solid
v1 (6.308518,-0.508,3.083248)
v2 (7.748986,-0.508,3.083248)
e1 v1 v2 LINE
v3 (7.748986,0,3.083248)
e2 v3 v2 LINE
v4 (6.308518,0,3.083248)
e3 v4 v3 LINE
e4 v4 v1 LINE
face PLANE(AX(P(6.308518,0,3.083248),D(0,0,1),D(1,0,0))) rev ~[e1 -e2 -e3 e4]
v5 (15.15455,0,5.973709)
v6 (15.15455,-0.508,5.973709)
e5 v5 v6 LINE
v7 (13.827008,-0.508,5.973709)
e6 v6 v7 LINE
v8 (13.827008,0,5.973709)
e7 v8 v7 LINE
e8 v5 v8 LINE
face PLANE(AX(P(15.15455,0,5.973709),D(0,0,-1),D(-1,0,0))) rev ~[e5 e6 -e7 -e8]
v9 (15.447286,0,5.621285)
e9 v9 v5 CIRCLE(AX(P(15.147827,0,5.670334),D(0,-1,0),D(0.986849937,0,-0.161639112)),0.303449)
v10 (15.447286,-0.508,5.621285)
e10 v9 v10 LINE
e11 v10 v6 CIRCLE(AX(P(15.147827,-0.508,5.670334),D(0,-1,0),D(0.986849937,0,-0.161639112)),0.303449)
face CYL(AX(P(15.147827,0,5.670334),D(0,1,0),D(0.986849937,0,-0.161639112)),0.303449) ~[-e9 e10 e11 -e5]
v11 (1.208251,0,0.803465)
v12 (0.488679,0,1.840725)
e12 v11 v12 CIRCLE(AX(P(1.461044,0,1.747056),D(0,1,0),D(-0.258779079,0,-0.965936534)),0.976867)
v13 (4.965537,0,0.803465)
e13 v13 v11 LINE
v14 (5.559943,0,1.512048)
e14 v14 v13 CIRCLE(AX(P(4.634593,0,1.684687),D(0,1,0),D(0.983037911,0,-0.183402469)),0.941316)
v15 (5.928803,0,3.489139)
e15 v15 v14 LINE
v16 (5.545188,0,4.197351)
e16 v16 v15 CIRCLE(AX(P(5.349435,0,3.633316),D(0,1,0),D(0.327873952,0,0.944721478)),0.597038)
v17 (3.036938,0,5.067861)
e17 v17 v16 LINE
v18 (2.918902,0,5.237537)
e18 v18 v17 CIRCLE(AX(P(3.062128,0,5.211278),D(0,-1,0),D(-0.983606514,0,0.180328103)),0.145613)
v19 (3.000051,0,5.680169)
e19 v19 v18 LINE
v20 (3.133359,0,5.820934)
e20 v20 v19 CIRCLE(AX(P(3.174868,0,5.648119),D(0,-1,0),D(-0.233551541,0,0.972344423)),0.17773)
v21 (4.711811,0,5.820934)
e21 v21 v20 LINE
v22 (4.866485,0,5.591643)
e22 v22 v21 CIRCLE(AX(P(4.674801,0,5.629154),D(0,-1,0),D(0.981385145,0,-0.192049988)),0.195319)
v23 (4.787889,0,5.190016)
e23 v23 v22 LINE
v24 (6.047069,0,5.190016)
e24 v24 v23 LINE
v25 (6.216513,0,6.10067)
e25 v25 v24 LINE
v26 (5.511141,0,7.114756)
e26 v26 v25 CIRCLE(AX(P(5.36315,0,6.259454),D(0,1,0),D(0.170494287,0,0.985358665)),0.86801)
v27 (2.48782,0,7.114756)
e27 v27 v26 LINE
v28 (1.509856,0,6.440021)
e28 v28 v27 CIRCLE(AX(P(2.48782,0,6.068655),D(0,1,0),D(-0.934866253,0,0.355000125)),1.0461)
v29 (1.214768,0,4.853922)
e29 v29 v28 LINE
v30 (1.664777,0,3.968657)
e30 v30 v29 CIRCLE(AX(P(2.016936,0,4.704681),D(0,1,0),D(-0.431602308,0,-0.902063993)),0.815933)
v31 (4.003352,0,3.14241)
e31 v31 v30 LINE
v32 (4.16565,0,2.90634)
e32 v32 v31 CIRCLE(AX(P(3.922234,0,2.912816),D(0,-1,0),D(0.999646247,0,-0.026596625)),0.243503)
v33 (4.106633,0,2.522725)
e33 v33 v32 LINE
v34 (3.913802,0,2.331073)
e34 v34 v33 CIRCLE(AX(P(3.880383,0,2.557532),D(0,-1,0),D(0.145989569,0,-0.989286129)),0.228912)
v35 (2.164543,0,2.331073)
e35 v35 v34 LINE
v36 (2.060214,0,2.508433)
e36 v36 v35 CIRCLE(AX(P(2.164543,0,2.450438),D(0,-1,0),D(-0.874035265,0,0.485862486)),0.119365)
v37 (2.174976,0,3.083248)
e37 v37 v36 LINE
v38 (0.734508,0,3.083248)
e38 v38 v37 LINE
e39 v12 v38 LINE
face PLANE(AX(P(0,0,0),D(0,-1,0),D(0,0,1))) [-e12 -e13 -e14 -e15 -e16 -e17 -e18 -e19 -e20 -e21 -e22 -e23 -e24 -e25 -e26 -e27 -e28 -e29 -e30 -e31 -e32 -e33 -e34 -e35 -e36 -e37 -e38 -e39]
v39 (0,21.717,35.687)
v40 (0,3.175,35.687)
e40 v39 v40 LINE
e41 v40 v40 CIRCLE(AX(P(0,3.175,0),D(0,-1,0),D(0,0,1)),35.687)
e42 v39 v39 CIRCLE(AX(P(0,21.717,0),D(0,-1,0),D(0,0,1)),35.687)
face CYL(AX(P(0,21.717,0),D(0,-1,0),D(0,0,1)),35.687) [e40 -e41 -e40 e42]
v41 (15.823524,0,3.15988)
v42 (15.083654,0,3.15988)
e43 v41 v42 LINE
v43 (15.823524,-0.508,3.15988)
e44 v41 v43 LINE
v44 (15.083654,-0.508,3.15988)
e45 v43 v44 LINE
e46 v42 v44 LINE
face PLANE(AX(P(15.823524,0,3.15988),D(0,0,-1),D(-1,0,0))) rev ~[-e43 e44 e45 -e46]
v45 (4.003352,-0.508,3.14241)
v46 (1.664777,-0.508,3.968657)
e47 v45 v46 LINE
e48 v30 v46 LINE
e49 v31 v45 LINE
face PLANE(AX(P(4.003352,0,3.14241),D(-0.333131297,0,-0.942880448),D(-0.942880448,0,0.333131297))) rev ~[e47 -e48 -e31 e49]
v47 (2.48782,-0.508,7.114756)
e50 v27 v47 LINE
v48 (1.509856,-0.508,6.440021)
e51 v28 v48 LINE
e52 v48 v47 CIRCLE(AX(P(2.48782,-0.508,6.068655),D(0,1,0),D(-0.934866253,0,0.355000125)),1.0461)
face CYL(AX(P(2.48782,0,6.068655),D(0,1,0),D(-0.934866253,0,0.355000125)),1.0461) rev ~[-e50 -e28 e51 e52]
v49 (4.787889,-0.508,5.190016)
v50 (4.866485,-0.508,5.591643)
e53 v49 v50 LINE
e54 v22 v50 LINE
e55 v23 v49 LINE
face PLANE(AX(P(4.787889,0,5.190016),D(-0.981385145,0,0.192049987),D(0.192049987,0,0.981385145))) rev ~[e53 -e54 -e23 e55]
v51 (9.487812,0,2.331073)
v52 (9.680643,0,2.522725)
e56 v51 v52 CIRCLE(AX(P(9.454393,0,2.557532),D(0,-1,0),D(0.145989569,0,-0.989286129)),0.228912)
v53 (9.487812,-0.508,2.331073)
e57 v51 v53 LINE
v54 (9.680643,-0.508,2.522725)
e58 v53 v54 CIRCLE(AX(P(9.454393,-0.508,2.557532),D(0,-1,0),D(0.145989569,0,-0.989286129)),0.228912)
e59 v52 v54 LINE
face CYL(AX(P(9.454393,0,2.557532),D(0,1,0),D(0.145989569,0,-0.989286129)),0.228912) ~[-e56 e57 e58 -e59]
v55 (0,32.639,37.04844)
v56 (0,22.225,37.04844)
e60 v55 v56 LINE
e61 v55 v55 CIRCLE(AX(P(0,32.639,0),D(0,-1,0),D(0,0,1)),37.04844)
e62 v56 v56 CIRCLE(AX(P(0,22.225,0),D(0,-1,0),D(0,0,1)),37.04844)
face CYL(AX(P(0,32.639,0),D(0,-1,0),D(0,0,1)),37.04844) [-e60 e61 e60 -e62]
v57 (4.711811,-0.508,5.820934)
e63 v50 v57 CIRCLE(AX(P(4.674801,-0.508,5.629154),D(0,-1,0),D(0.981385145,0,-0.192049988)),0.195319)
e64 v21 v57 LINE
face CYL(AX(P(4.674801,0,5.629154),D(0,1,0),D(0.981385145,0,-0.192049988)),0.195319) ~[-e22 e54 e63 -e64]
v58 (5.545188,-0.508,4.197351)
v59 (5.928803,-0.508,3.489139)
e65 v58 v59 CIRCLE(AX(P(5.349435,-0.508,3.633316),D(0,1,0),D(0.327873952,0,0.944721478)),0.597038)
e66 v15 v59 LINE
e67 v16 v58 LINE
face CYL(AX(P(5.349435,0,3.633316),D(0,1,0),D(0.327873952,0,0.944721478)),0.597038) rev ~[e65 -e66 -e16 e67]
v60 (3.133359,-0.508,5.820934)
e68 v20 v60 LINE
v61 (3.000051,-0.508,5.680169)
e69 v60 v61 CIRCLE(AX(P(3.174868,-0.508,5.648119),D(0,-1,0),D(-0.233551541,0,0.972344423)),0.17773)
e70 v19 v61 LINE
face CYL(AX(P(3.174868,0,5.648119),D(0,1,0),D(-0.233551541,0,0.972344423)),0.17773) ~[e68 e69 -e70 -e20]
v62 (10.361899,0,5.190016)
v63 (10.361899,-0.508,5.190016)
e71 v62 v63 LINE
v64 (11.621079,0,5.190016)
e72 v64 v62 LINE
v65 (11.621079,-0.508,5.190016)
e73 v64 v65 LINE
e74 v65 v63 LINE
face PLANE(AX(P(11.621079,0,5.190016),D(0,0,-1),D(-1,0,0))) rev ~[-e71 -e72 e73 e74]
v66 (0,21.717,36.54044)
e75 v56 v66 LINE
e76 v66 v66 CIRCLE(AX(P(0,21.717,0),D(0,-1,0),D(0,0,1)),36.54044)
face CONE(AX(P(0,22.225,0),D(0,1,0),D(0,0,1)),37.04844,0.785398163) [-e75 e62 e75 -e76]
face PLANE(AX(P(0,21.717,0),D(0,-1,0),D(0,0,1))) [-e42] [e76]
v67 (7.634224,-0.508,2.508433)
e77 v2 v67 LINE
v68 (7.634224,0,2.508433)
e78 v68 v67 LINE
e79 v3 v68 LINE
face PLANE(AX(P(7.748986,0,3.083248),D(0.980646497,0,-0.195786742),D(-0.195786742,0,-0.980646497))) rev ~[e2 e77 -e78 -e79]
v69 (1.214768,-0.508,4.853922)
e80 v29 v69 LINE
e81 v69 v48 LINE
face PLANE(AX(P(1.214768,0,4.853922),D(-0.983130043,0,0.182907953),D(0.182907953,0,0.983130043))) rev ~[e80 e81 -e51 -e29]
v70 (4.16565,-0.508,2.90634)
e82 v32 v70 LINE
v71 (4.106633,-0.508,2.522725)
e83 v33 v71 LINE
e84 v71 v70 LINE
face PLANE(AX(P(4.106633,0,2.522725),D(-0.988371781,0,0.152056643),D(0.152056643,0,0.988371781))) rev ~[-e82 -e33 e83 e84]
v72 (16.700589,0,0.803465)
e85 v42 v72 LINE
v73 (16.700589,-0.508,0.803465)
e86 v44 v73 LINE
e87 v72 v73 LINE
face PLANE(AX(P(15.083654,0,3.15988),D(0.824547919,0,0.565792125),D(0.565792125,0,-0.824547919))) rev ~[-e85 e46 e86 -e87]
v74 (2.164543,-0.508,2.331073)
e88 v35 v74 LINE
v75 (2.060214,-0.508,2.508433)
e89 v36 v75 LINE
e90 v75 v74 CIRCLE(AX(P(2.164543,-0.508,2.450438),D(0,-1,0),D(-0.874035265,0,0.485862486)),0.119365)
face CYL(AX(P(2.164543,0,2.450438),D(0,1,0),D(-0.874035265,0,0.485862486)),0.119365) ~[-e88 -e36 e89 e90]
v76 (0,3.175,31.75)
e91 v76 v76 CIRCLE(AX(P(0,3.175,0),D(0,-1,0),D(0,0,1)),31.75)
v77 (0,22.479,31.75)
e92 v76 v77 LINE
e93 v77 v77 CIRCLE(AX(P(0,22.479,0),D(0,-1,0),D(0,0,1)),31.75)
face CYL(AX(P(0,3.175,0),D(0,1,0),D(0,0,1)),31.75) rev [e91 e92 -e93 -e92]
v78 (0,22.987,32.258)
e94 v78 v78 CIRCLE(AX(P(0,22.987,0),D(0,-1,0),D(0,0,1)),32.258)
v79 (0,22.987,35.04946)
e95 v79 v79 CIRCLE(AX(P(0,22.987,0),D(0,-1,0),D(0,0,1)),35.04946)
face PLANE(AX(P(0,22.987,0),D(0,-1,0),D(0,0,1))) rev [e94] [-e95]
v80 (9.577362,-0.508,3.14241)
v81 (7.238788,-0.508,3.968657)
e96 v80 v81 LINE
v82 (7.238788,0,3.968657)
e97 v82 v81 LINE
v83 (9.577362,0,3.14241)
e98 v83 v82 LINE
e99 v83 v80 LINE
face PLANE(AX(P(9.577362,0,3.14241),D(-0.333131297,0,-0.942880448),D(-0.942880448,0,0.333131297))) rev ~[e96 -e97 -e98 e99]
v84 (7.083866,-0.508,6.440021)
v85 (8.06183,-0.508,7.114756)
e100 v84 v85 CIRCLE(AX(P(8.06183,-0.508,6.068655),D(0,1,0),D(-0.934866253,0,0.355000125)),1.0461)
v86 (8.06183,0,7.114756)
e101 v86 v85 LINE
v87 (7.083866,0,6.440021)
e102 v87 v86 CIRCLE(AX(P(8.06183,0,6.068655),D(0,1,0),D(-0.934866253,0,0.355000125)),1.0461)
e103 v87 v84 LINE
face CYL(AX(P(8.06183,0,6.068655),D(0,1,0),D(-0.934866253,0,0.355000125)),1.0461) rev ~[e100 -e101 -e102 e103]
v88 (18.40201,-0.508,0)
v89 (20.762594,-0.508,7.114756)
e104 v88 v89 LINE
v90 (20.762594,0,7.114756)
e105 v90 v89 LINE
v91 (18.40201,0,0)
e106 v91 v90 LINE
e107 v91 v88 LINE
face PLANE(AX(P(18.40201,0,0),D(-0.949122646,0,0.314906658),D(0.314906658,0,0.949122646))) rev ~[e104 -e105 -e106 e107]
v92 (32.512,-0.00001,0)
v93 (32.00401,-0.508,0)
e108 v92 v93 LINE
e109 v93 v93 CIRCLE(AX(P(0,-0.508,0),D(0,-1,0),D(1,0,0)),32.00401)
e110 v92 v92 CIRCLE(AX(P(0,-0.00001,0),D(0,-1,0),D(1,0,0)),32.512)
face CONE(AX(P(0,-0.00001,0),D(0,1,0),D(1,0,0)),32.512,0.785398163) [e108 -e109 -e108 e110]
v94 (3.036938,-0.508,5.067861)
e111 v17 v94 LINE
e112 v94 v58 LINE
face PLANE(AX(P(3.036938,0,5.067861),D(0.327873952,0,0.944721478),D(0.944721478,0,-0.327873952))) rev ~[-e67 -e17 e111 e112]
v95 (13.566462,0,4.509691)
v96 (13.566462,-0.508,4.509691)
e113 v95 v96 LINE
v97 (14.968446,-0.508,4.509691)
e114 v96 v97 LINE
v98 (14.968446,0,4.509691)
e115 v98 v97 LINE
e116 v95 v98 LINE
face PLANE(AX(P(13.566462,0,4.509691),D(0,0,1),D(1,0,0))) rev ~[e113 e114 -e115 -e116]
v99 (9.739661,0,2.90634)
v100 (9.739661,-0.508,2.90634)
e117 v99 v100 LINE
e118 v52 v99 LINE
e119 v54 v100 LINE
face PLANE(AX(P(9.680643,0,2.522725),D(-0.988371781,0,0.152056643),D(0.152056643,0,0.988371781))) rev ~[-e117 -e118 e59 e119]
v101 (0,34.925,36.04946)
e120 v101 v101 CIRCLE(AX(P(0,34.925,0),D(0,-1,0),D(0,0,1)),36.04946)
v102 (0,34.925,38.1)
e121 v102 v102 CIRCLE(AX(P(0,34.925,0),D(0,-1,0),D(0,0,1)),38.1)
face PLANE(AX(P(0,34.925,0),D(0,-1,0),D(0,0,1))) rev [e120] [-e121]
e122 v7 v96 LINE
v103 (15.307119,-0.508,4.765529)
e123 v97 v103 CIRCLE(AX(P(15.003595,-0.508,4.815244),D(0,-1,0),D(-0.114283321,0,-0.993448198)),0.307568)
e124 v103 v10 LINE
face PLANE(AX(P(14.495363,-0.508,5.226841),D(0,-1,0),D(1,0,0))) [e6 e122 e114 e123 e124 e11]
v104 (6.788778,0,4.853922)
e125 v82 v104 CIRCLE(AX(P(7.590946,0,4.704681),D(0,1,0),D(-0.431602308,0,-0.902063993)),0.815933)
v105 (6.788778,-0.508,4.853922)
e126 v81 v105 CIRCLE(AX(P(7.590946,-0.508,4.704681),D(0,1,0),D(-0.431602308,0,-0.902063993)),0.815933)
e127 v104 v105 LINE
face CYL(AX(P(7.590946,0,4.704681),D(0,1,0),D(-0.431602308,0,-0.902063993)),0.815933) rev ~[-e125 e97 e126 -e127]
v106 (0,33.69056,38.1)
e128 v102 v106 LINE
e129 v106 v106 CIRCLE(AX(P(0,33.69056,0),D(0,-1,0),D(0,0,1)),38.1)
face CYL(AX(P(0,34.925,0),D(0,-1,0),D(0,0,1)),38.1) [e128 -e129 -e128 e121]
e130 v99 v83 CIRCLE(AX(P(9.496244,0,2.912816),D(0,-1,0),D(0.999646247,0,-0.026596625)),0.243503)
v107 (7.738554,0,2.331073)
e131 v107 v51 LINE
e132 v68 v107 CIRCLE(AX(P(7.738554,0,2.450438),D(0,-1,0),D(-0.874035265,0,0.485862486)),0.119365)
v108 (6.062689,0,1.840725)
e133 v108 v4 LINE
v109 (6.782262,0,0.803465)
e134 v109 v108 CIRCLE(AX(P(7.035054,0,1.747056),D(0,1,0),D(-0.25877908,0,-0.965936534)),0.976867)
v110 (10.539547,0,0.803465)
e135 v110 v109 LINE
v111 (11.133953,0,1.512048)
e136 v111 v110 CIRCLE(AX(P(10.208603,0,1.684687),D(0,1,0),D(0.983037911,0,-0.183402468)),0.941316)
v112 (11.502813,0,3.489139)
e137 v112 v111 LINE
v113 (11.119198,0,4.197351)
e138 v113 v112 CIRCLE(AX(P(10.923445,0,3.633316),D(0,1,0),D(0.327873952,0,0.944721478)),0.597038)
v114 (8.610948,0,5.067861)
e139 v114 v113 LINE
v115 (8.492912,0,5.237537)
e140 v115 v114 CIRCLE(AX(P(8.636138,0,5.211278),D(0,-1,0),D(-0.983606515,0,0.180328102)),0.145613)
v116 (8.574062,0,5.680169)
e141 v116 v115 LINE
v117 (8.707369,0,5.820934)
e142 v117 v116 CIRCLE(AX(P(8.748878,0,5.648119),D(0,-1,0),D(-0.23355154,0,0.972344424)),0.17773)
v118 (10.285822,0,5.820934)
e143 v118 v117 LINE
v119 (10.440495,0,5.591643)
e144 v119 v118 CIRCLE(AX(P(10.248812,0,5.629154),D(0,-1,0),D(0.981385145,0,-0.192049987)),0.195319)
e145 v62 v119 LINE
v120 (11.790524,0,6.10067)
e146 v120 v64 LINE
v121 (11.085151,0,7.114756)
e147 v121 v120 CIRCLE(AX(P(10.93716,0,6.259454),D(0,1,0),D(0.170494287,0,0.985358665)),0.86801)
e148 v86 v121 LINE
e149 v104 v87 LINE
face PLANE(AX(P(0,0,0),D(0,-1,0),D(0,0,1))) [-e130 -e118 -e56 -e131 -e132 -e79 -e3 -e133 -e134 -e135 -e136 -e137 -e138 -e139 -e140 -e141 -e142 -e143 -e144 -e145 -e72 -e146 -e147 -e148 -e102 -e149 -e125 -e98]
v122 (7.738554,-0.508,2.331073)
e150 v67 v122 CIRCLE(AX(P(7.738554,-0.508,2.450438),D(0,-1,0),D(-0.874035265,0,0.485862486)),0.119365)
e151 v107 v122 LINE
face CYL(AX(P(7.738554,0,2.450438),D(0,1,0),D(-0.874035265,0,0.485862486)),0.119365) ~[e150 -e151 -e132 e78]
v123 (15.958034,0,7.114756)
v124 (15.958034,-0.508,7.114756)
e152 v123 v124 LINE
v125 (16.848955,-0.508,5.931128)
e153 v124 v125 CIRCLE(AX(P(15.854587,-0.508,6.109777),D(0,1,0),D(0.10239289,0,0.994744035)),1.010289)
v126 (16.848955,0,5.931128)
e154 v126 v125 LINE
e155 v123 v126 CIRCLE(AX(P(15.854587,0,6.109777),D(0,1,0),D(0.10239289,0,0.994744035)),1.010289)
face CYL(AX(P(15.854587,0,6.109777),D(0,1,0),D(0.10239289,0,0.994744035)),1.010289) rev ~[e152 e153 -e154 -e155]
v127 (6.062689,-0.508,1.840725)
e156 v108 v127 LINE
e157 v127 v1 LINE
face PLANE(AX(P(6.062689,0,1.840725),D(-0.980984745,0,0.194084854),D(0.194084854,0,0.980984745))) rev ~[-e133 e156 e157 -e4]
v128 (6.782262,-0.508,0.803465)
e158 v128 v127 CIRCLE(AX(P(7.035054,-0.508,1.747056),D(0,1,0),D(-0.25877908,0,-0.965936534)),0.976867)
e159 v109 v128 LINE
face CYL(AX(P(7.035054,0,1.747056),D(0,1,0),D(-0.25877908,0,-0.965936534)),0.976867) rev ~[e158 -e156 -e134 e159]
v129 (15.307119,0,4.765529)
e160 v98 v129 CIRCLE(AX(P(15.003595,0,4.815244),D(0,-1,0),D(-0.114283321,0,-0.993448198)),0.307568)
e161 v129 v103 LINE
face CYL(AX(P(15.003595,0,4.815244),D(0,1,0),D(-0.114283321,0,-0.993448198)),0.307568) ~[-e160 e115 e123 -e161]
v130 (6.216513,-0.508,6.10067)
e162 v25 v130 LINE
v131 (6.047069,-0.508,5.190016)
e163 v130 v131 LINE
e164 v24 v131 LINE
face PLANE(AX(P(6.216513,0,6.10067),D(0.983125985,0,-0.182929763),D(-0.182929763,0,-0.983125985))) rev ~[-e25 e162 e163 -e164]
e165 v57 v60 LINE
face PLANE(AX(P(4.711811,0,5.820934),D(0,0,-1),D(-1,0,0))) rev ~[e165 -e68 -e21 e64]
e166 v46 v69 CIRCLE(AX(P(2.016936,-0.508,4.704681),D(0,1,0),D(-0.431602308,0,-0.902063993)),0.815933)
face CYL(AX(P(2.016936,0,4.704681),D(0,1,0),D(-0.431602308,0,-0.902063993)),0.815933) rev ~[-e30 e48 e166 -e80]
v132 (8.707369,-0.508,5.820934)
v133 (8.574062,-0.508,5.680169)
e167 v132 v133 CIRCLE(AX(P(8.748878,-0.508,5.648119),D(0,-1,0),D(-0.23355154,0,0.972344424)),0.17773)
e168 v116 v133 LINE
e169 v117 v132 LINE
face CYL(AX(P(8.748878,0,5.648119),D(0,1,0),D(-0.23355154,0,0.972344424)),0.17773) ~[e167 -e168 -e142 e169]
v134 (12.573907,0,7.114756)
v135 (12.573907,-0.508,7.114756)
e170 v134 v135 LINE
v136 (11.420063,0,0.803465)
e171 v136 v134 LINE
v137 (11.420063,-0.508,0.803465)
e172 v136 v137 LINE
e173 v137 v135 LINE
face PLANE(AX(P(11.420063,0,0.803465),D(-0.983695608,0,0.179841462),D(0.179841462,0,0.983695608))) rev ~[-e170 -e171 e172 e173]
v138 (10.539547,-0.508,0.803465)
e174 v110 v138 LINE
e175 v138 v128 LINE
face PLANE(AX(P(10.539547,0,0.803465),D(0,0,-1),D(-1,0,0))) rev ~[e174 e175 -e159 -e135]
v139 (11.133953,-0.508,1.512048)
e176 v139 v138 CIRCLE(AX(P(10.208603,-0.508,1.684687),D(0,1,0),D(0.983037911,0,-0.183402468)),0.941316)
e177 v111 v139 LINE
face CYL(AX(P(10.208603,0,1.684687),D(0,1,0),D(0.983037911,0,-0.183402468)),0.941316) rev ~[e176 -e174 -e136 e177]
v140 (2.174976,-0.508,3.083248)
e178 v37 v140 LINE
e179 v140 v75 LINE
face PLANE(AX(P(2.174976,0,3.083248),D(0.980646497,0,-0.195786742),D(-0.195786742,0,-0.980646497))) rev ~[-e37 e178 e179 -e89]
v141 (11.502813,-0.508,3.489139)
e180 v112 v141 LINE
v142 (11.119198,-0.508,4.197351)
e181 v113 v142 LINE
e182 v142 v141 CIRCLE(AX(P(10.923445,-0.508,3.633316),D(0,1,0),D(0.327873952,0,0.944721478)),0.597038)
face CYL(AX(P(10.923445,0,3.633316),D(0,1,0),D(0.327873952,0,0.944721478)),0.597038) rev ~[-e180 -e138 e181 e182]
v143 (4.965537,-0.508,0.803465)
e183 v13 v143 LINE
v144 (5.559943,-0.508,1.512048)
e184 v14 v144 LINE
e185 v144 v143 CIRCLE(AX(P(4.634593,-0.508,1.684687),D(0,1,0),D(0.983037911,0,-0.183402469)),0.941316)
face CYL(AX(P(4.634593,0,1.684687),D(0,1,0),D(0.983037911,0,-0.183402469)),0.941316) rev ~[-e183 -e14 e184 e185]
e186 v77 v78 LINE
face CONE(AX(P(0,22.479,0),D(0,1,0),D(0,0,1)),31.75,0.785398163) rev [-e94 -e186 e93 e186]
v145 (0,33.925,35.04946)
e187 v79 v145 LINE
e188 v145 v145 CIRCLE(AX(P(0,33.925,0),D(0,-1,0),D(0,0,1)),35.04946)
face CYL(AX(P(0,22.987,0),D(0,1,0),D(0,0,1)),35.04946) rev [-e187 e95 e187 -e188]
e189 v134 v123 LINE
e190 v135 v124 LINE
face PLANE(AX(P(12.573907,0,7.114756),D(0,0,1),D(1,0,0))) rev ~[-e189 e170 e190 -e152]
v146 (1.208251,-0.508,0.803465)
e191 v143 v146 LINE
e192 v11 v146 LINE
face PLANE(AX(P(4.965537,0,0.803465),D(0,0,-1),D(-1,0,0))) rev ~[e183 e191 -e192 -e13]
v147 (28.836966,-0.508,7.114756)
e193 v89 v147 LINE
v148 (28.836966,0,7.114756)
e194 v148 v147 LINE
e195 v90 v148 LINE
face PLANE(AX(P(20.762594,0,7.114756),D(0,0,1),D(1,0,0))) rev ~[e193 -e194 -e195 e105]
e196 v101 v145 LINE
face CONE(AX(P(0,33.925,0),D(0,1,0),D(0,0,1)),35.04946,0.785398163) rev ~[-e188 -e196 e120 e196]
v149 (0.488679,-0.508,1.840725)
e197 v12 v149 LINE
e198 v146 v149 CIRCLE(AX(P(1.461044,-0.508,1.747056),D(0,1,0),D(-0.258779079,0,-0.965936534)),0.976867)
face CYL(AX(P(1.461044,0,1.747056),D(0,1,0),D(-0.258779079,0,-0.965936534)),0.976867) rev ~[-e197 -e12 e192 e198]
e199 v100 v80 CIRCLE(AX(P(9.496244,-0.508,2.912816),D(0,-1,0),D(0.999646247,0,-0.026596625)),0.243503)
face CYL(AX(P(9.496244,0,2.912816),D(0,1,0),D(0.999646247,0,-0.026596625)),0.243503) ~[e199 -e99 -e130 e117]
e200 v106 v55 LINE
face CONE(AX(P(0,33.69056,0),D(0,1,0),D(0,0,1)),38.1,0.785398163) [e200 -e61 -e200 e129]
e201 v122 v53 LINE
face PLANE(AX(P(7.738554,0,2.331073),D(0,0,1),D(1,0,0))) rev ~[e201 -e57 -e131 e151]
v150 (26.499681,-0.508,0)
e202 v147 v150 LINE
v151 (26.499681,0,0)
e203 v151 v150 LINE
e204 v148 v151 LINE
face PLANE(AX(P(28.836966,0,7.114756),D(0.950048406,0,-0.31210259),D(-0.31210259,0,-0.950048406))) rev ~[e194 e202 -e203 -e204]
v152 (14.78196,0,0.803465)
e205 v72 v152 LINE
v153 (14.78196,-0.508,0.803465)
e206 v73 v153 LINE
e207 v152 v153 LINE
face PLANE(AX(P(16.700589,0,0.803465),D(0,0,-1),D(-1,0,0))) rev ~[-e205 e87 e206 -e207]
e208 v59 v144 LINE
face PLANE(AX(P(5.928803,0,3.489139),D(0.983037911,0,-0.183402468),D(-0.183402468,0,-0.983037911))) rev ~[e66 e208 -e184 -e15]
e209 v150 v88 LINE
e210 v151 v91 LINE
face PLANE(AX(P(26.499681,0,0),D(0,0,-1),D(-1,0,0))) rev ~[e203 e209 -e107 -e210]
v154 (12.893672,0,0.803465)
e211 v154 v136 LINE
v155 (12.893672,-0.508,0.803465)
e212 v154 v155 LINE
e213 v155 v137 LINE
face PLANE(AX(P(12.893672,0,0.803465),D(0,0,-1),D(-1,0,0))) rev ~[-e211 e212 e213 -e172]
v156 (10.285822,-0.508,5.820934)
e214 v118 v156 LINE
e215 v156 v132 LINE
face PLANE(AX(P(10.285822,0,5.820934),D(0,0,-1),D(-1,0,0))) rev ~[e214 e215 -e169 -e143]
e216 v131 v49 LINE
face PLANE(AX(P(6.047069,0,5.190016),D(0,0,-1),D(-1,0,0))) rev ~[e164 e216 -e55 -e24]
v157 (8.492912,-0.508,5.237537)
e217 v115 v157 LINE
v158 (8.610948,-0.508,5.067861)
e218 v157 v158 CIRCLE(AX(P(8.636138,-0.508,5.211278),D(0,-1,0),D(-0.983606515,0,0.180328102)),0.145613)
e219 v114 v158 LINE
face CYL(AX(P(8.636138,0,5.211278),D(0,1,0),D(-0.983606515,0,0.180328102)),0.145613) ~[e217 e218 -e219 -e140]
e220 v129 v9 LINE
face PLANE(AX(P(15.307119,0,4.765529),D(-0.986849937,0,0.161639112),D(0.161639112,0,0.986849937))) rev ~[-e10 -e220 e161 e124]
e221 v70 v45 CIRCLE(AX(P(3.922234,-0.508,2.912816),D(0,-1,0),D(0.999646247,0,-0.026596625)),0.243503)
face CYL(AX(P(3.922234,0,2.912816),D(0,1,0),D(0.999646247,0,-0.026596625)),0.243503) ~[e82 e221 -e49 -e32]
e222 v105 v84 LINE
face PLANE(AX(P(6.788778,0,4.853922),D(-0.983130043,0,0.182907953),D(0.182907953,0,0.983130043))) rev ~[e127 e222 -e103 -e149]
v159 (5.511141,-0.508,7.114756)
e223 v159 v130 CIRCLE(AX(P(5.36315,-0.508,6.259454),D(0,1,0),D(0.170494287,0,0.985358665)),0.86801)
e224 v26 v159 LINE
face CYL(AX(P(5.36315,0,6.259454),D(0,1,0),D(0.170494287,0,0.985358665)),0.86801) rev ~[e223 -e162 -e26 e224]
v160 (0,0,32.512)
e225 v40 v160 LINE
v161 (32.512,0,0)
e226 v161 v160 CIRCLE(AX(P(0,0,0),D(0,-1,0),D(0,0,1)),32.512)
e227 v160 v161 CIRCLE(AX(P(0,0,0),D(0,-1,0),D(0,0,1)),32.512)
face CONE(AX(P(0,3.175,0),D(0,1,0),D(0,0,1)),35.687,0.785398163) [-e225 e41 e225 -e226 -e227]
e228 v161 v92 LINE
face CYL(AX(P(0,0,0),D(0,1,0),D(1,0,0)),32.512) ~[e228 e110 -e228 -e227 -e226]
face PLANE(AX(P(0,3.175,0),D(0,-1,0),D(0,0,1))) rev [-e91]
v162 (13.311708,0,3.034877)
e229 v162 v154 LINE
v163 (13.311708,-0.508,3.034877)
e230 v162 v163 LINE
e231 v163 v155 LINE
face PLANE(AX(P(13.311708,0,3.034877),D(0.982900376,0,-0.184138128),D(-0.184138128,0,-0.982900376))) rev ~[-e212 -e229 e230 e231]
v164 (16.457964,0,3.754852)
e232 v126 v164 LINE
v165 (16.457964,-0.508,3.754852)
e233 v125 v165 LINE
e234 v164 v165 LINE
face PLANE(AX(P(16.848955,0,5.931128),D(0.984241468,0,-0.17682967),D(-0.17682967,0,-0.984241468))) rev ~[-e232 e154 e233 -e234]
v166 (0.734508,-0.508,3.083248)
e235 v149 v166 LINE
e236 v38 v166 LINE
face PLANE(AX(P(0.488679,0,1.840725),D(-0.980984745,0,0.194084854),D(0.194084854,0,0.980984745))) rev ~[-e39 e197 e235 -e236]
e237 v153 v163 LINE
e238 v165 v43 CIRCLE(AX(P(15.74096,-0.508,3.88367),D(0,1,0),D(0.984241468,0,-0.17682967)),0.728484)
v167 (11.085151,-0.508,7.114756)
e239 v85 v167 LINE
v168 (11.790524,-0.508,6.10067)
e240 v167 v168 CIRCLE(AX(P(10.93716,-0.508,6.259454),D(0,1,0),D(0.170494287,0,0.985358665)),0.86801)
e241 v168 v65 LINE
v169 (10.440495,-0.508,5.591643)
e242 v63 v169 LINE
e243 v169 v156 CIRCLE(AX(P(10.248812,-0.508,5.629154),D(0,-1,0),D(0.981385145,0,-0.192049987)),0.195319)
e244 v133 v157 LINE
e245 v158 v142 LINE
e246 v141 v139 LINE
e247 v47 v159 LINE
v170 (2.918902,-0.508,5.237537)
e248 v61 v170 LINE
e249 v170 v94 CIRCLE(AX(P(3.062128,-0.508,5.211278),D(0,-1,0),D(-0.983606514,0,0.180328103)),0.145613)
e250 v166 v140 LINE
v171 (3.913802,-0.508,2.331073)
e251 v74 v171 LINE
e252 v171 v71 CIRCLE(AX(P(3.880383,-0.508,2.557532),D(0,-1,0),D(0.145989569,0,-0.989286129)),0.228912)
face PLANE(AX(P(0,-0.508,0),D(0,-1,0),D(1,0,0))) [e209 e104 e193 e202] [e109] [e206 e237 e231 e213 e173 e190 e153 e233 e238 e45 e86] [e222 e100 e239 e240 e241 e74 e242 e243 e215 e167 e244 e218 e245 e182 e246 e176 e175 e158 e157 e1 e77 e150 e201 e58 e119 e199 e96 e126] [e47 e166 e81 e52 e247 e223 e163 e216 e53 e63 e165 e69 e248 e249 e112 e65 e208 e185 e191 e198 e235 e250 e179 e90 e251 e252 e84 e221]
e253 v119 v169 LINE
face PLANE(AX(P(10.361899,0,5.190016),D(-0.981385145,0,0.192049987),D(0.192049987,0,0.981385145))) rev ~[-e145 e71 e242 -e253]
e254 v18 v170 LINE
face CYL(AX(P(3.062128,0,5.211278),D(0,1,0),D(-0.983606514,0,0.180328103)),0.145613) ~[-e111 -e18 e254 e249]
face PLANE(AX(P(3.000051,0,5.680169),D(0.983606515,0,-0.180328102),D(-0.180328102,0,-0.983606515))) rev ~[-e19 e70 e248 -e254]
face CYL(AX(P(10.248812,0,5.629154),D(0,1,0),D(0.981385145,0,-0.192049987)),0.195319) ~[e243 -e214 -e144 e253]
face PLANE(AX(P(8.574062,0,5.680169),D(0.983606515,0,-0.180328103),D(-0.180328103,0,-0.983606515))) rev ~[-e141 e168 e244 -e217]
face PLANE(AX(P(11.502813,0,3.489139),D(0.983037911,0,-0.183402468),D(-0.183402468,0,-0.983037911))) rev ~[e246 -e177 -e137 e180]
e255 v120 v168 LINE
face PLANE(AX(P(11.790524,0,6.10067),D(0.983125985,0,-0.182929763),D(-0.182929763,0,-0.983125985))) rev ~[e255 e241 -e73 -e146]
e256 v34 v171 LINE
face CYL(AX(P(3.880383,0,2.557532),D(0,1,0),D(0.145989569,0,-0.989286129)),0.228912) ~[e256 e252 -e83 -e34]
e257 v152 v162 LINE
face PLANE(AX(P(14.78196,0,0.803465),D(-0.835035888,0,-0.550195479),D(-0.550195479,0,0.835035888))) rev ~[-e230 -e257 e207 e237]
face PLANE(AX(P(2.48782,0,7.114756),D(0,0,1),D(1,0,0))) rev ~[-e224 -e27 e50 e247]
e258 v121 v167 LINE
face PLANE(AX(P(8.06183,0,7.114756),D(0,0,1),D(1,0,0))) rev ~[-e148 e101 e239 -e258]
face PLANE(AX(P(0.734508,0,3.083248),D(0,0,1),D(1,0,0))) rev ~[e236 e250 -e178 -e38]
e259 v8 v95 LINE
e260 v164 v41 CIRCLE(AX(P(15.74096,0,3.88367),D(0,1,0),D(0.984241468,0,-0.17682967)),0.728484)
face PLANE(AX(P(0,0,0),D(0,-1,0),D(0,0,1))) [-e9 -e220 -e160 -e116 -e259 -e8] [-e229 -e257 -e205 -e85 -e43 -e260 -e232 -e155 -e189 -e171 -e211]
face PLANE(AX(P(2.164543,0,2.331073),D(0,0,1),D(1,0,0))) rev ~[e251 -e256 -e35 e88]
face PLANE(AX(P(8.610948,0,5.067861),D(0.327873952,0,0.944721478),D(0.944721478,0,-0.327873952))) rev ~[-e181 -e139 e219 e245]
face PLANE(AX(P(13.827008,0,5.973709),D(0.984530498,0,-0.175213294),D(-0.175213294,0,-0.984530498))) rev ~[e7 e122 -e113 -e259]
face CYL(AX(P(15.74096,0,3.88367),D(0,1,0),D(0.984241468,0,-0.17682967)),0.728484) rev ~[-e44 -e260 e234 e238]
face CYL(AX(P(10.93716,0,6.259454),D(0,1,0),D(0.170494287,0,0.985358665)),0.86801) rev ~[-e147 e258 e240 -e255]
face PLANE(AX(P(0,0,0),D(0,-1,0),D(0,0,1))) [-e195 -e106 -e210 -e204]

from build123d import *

# Parameters (mm, degrees)
F2_SIZE  = 0.508
F3_SIZE  = 3.175
F4_R     = 32.512
F5_DEPTH = 0.508
F6_SIZE  = 0.50799
F7_SIZE  = 1


# Not quite as in the source:
# - a fillet or chamfer is up to 0.001 mm smaller than in the source, because OpenCascade refuses the exact size


with BuildPart() as f1:
    # F0 (on Right) → F1 (revolve)
    with BuildSketch(Plane.YZ):
        Polygon((0, 35.687), (0, 0), (3.175, 0), (3.175, 31.75), (22.987, 31.75), (22.987, 35.04946), (34.925, 35.04946), (34.925, 38.1), (33.69056, 38.1), (32.639, 37.04844), (21.717, 37.04844), (21.717, 35.687), align=None)
    revolve(axis=Axis((0, 1.5875, 0), (0, -1, 0)))

    # F2
    f2_edges = [f1.edges().sort_by_distance(p)[0] for p in [
        (0, 21.717, -37.04844),
        (0, 22.987, -31.75),
    ]]
    chamfer(f2_edges, length=F2_SIZE)

    # F3
    f3_edges = [f1.edges().sort_by_distance(p)[0] for p in [
        (0, 0, -35.687),
    ]]
    chamfer(f3_edges, length=F3_SIZE)

    # F4 (on face) → F5 (join)
    with BuildSketch(Plane.XZ):
        Circle(F4_R)
        with BuildLine():
            ThreePointArc((1.509855967, 6.4400210977), (1.8937491355, 6.9297046378), (2.4878198747, 7.1147556882))
            Line((2.4878198747, 7.1147556882), (5.5111409165, 7.1147556882))
            ThreePointArc((5.5111409165, 7.1147556882), (6.0757301057, 6.7551068727), (6.2165134586, 6.1006695032))
            Line((6.2165134586, 6.1006695032), (6.0470685713, 5.1900157705))
            Line((6.0470685713, 5.1900157705), (4.7878890863, 5.1900157705))
            Line((4.7878890863, 5.1900157705), (4.8664845526, 5.5916425772))
            ThreePointArc((4.8664845526, 5.5916425772), (4.836723562, 5.7383814637), (4.7118113372, 5.8209341951))
            Line((4.7118113372, 5.8209341951), (3.1333588995, 5.8209341951))
            ThreePointArc((3.1333588995, 5.8209341951), (3.0458218752, 5.7703284959), (3.0000514816, 5.6801689789))
            Line((3.0000514816, 5.6801689789), (2.9189020861, 5.2375365049))
            ThreePointArc((2.9189020861, 5.2375365049), (2.9425937197, 5.1281238685), (3.0369379092, 5.0678611733))
            Line((3.0369379092, 5.0678611733), (5.5451882072, 4.1973507032))
            ThreePointArc((5.5451882072, 4.1973507032), (5.8744055755, 3.9176753087), (5.9288027696, 3.4891390242))
            Line((5.9288027696, 3.4891390242), (5.5599426851, 1.5120476019))
            ThreePointArc((5.5599426851, 1.5120476019), (5.3557662432, 1.0797199091), (4.9655372277, 0.8034653729))
            Line((4.9655372277, 0.8034653729), (1.2082514586, 0.8034653729))
            ThreePointArc((1.2082514586, 0.8034653729), (0.6584047868, 1.1902455436), (0.4886787001, 1.8407248426))
            Line((0.4886787001, 1.8407248426), (0.7345082122, 3.0832483899))
            Line((0.7345082122, 3.0832483899), (2.1749762818, 3.0832483899))
            Line((2.1749762818, 3.0832483899), (2.0602140576, 2.5084333029))
            ThreePointArc((2.0602140576, 2.5084333029), (2.0616584556, 2.3899178369), (2.1645433735, 2.3310731631))
            Line((2.1645433735, 2.3310731631), (3.9138016291, 2.3310731631))
            ThreePointArc((3.9138016291, 2.3310731631), (4.0417506777, 2.3951715526), (4.1066328995, 2.5227249134))
            Line((4.1066328995, 2.5227249134), (4.1656503454, 2.9063397087))
            ThreePointArc((4.1656503454, 2.9063397087), (4.1228902349, 3.0507674018), (4.0033520199, 3.1424101908))
            Line((4.0033520199, 3.1424101908), (1.6647774028, 3.9686574601))
            ThreePointArc((1.6647774028, 3.9686574601), (1.2895839844, 4.3349438035), (1.2147676898, 4.8539219424))
            Line((1.2147676898, 4.8539219424), (1.509855967, 6.4400210977))
        make_face(mode=Mode.SUBTRACT)
        with BuildLine():
            Line((6.0626888962, 1.8407248426), (6.3085184083, 3.0832483899))
            Line((6.3085184083, 3.0832483899), (7.748986478, 3.0832483899))
            Line((7.748986478, 3.0832483899), (7.6342242537, 2.5084333029))
            ThreePointArc((7.6342242537, 2.5084333029), (7.6356686517, 2.3899178369), (7.7385535697, 2.3310731631))
            Line((7.7385535697, 2.3310731631), (9.4878118252, 2.3310731631))
            ThreePointArc((9.4878118252, 2.3310731631), (9.6157608738, 2.3951715526), (9.6806430956, 2.5227249134))
            Line((9.6806430956, 2.5227249134), (9.7396605415, 2.9063397087))
            ThreePointArc((9.7396605415, 2.9063397087), (9.696900431, 3.0507674018), (9.5773622161, 3.1424101908))
            Line((9.5773622161, 3.1424101908), (7.2387875989, 3.9686574601))
            ThreePointArc((7.2387875989, 3.9686574601), (6.8635941806, 4.3349438035), (6.788777886, 4.8539219424))
            Line((6.788777886, 4.8539219424), (7.0838661632, 6.4400210977))
            ThreePointArc((7.0838661632, 6.4400210977), (7.4677593317, 6.9297046378), (8.0618300708, 7.1147556882))
            Line((8.0618300708, 7.1147556882), (11.0851511126, 7.1147556882))
            ThreePointArc((11.0851511126, 7.1147556882), (11.6497403019, 6.7551068727), (11.7905236548, 6.1006695032))
            Line((11.7905236548, 6.1006695032), (11.6210787675, 5.1900157705))
            Line((11.6210787675, 5.1900157705), (10.3618992824, 5.1900157705))
            Line((10.3618992824, 5.1900157705), (10.4404947488, 5.5916425772))
            ThreePointArc((10.4404947488, 5.5916425772), (10.4107337581, 5.7383814637), (10.2858215333, 5.8209341951))
            Line((10.2858215333, 5.8209341951), (8.7073690956, 5.8209341951))
            ThreePointArc((8.7073690956, 5.8209341951), (8.6198320713, 5.7703284959), (8.5740616778, 5.6801689789))
            Line((8.5740616778, 5.6801689789), (8.4929122822, 5.2375365049))
            ThreePointArc((8.4929122822, 5.2375365049), (8.5166039159, 5.1281238685), (8.6109481053, 5.0678611733))
            Line((8.6109481053, 5.0678611733), (11.1191984033, 4.1973507032))
            ThreePointArc((11.1191984033, 4.1973507032), (11.4484157717, 3.9176753087), (11.5028129658, 3.4891390242))
            Line((11.5028129658, 3.4891390242), (11.1339528812, 1.5120476019))
            ThreePointArc((11.1339528812, 1.5120476019), (10.9297764394, 1.0797199091), (10.5395474238, 0.8034653729))
            Line((10.5395474238, 0.8034653729), (6.7822616547, 0.8034653729))
            ThreePointArc((6.7822616547, 0.8034653729), (6.232414983, 1.1902455436), (6.0626888962, 1.8407248426))
        make_face(mode=Mode.SUBTRACT)
        with BuildLine():
            Line((15.0836538523, 3.1598797068), (16.7005891971, 0.8034653729))
            Line((16.7005891971, 0.8034653729), (14.781959715, 0.8034653729))
            Line((14.781959715, 0.8034653729), (13.311708346, 3.0348771252))
            Line((13.311708346, 3.0348771252), (12.8936721012, 0.8034653729))
            Line((12.8936721012, 0.8034653729), (11.4200627431, 0.8034653729))
            Line((11.4200627431, 0.8034653729), (12.5739071518, 7.1147556882))
            Line((12.5739071518, 7.1147556882), (15.9580335021, 7.1147556882))
            ThreePointArc((15.9580335021, 7.1147556882), (16.6617692136, 6.7173463158), (16.8489553034, 5.9311278164))
            Line((16.8489553034, 5.9311278164), (16.4579637349, 3.7548521068))
            ThreePointArc((16.4579637349, 3.7548521068), (16.2392824666, 3.3522910872), (15.8235244453, 3.1598797068))
            Line((15.8235244453, 3.1598797068), (15.0836538523, 3.1598797068))
        make_face(mode=Mode.SUBTRACT)
        Polygon((26.1573679745, 7.1147556882), (28.8369659559, 7.1147556882), (26.4996811748, 0), (23.7947255373, 0), (21.1136136204, 0), (18.4020102024, 0), (20.7625944167, 7.1147556882), (23.4577525407, 7.1147556882), align=None, mode=Mode.SUBTRACT)
        with BuildLine():
            Line((15.154549852, 5.9737088159), (13.8270081952, 5.9737088159))
            Line((13.8270081952, 5.9737088159), (13.5664623231, 4.509691149))
            Line((13.5664623231, 4.509691149), (14.9684455246, 4.509691149))
            ThreePointArc((14.9684455246, 4.509691149), (15.1889852841, 4.5698286448), (15.3071191162, 4.7655291855))
            Line((15.3071191162, 4.7655291855), (15.4472859576, 5.6212851778))
            ThreePointArc((15.4472859576, 5.6212851778), (15.3812525761, 5.8642259453), (15.154549852, 5.9737088159))
        make_face()
    extrude(amount=F5_DEPTH)

    # F6 (size 0.508 in the source; OpenCascade refuses exactly that, so slightly less here)
    f6_edges = [f1.edges().sort_by_distance(p)[0] for p in [
        (0, 12.446, 35.687),
        (-32.512, -0.508, 0),
    ]]
    chamfer(f6_edges, length=F6_SIZE)

    # F7
    f7_edges = [f1.edges().sort_by_distance(p)[0] for p in [
        (0, 34.925, -35.04946),
    ]]
    chamfer(f7_edges, length=F7_SIZE)


solid = f1.part
